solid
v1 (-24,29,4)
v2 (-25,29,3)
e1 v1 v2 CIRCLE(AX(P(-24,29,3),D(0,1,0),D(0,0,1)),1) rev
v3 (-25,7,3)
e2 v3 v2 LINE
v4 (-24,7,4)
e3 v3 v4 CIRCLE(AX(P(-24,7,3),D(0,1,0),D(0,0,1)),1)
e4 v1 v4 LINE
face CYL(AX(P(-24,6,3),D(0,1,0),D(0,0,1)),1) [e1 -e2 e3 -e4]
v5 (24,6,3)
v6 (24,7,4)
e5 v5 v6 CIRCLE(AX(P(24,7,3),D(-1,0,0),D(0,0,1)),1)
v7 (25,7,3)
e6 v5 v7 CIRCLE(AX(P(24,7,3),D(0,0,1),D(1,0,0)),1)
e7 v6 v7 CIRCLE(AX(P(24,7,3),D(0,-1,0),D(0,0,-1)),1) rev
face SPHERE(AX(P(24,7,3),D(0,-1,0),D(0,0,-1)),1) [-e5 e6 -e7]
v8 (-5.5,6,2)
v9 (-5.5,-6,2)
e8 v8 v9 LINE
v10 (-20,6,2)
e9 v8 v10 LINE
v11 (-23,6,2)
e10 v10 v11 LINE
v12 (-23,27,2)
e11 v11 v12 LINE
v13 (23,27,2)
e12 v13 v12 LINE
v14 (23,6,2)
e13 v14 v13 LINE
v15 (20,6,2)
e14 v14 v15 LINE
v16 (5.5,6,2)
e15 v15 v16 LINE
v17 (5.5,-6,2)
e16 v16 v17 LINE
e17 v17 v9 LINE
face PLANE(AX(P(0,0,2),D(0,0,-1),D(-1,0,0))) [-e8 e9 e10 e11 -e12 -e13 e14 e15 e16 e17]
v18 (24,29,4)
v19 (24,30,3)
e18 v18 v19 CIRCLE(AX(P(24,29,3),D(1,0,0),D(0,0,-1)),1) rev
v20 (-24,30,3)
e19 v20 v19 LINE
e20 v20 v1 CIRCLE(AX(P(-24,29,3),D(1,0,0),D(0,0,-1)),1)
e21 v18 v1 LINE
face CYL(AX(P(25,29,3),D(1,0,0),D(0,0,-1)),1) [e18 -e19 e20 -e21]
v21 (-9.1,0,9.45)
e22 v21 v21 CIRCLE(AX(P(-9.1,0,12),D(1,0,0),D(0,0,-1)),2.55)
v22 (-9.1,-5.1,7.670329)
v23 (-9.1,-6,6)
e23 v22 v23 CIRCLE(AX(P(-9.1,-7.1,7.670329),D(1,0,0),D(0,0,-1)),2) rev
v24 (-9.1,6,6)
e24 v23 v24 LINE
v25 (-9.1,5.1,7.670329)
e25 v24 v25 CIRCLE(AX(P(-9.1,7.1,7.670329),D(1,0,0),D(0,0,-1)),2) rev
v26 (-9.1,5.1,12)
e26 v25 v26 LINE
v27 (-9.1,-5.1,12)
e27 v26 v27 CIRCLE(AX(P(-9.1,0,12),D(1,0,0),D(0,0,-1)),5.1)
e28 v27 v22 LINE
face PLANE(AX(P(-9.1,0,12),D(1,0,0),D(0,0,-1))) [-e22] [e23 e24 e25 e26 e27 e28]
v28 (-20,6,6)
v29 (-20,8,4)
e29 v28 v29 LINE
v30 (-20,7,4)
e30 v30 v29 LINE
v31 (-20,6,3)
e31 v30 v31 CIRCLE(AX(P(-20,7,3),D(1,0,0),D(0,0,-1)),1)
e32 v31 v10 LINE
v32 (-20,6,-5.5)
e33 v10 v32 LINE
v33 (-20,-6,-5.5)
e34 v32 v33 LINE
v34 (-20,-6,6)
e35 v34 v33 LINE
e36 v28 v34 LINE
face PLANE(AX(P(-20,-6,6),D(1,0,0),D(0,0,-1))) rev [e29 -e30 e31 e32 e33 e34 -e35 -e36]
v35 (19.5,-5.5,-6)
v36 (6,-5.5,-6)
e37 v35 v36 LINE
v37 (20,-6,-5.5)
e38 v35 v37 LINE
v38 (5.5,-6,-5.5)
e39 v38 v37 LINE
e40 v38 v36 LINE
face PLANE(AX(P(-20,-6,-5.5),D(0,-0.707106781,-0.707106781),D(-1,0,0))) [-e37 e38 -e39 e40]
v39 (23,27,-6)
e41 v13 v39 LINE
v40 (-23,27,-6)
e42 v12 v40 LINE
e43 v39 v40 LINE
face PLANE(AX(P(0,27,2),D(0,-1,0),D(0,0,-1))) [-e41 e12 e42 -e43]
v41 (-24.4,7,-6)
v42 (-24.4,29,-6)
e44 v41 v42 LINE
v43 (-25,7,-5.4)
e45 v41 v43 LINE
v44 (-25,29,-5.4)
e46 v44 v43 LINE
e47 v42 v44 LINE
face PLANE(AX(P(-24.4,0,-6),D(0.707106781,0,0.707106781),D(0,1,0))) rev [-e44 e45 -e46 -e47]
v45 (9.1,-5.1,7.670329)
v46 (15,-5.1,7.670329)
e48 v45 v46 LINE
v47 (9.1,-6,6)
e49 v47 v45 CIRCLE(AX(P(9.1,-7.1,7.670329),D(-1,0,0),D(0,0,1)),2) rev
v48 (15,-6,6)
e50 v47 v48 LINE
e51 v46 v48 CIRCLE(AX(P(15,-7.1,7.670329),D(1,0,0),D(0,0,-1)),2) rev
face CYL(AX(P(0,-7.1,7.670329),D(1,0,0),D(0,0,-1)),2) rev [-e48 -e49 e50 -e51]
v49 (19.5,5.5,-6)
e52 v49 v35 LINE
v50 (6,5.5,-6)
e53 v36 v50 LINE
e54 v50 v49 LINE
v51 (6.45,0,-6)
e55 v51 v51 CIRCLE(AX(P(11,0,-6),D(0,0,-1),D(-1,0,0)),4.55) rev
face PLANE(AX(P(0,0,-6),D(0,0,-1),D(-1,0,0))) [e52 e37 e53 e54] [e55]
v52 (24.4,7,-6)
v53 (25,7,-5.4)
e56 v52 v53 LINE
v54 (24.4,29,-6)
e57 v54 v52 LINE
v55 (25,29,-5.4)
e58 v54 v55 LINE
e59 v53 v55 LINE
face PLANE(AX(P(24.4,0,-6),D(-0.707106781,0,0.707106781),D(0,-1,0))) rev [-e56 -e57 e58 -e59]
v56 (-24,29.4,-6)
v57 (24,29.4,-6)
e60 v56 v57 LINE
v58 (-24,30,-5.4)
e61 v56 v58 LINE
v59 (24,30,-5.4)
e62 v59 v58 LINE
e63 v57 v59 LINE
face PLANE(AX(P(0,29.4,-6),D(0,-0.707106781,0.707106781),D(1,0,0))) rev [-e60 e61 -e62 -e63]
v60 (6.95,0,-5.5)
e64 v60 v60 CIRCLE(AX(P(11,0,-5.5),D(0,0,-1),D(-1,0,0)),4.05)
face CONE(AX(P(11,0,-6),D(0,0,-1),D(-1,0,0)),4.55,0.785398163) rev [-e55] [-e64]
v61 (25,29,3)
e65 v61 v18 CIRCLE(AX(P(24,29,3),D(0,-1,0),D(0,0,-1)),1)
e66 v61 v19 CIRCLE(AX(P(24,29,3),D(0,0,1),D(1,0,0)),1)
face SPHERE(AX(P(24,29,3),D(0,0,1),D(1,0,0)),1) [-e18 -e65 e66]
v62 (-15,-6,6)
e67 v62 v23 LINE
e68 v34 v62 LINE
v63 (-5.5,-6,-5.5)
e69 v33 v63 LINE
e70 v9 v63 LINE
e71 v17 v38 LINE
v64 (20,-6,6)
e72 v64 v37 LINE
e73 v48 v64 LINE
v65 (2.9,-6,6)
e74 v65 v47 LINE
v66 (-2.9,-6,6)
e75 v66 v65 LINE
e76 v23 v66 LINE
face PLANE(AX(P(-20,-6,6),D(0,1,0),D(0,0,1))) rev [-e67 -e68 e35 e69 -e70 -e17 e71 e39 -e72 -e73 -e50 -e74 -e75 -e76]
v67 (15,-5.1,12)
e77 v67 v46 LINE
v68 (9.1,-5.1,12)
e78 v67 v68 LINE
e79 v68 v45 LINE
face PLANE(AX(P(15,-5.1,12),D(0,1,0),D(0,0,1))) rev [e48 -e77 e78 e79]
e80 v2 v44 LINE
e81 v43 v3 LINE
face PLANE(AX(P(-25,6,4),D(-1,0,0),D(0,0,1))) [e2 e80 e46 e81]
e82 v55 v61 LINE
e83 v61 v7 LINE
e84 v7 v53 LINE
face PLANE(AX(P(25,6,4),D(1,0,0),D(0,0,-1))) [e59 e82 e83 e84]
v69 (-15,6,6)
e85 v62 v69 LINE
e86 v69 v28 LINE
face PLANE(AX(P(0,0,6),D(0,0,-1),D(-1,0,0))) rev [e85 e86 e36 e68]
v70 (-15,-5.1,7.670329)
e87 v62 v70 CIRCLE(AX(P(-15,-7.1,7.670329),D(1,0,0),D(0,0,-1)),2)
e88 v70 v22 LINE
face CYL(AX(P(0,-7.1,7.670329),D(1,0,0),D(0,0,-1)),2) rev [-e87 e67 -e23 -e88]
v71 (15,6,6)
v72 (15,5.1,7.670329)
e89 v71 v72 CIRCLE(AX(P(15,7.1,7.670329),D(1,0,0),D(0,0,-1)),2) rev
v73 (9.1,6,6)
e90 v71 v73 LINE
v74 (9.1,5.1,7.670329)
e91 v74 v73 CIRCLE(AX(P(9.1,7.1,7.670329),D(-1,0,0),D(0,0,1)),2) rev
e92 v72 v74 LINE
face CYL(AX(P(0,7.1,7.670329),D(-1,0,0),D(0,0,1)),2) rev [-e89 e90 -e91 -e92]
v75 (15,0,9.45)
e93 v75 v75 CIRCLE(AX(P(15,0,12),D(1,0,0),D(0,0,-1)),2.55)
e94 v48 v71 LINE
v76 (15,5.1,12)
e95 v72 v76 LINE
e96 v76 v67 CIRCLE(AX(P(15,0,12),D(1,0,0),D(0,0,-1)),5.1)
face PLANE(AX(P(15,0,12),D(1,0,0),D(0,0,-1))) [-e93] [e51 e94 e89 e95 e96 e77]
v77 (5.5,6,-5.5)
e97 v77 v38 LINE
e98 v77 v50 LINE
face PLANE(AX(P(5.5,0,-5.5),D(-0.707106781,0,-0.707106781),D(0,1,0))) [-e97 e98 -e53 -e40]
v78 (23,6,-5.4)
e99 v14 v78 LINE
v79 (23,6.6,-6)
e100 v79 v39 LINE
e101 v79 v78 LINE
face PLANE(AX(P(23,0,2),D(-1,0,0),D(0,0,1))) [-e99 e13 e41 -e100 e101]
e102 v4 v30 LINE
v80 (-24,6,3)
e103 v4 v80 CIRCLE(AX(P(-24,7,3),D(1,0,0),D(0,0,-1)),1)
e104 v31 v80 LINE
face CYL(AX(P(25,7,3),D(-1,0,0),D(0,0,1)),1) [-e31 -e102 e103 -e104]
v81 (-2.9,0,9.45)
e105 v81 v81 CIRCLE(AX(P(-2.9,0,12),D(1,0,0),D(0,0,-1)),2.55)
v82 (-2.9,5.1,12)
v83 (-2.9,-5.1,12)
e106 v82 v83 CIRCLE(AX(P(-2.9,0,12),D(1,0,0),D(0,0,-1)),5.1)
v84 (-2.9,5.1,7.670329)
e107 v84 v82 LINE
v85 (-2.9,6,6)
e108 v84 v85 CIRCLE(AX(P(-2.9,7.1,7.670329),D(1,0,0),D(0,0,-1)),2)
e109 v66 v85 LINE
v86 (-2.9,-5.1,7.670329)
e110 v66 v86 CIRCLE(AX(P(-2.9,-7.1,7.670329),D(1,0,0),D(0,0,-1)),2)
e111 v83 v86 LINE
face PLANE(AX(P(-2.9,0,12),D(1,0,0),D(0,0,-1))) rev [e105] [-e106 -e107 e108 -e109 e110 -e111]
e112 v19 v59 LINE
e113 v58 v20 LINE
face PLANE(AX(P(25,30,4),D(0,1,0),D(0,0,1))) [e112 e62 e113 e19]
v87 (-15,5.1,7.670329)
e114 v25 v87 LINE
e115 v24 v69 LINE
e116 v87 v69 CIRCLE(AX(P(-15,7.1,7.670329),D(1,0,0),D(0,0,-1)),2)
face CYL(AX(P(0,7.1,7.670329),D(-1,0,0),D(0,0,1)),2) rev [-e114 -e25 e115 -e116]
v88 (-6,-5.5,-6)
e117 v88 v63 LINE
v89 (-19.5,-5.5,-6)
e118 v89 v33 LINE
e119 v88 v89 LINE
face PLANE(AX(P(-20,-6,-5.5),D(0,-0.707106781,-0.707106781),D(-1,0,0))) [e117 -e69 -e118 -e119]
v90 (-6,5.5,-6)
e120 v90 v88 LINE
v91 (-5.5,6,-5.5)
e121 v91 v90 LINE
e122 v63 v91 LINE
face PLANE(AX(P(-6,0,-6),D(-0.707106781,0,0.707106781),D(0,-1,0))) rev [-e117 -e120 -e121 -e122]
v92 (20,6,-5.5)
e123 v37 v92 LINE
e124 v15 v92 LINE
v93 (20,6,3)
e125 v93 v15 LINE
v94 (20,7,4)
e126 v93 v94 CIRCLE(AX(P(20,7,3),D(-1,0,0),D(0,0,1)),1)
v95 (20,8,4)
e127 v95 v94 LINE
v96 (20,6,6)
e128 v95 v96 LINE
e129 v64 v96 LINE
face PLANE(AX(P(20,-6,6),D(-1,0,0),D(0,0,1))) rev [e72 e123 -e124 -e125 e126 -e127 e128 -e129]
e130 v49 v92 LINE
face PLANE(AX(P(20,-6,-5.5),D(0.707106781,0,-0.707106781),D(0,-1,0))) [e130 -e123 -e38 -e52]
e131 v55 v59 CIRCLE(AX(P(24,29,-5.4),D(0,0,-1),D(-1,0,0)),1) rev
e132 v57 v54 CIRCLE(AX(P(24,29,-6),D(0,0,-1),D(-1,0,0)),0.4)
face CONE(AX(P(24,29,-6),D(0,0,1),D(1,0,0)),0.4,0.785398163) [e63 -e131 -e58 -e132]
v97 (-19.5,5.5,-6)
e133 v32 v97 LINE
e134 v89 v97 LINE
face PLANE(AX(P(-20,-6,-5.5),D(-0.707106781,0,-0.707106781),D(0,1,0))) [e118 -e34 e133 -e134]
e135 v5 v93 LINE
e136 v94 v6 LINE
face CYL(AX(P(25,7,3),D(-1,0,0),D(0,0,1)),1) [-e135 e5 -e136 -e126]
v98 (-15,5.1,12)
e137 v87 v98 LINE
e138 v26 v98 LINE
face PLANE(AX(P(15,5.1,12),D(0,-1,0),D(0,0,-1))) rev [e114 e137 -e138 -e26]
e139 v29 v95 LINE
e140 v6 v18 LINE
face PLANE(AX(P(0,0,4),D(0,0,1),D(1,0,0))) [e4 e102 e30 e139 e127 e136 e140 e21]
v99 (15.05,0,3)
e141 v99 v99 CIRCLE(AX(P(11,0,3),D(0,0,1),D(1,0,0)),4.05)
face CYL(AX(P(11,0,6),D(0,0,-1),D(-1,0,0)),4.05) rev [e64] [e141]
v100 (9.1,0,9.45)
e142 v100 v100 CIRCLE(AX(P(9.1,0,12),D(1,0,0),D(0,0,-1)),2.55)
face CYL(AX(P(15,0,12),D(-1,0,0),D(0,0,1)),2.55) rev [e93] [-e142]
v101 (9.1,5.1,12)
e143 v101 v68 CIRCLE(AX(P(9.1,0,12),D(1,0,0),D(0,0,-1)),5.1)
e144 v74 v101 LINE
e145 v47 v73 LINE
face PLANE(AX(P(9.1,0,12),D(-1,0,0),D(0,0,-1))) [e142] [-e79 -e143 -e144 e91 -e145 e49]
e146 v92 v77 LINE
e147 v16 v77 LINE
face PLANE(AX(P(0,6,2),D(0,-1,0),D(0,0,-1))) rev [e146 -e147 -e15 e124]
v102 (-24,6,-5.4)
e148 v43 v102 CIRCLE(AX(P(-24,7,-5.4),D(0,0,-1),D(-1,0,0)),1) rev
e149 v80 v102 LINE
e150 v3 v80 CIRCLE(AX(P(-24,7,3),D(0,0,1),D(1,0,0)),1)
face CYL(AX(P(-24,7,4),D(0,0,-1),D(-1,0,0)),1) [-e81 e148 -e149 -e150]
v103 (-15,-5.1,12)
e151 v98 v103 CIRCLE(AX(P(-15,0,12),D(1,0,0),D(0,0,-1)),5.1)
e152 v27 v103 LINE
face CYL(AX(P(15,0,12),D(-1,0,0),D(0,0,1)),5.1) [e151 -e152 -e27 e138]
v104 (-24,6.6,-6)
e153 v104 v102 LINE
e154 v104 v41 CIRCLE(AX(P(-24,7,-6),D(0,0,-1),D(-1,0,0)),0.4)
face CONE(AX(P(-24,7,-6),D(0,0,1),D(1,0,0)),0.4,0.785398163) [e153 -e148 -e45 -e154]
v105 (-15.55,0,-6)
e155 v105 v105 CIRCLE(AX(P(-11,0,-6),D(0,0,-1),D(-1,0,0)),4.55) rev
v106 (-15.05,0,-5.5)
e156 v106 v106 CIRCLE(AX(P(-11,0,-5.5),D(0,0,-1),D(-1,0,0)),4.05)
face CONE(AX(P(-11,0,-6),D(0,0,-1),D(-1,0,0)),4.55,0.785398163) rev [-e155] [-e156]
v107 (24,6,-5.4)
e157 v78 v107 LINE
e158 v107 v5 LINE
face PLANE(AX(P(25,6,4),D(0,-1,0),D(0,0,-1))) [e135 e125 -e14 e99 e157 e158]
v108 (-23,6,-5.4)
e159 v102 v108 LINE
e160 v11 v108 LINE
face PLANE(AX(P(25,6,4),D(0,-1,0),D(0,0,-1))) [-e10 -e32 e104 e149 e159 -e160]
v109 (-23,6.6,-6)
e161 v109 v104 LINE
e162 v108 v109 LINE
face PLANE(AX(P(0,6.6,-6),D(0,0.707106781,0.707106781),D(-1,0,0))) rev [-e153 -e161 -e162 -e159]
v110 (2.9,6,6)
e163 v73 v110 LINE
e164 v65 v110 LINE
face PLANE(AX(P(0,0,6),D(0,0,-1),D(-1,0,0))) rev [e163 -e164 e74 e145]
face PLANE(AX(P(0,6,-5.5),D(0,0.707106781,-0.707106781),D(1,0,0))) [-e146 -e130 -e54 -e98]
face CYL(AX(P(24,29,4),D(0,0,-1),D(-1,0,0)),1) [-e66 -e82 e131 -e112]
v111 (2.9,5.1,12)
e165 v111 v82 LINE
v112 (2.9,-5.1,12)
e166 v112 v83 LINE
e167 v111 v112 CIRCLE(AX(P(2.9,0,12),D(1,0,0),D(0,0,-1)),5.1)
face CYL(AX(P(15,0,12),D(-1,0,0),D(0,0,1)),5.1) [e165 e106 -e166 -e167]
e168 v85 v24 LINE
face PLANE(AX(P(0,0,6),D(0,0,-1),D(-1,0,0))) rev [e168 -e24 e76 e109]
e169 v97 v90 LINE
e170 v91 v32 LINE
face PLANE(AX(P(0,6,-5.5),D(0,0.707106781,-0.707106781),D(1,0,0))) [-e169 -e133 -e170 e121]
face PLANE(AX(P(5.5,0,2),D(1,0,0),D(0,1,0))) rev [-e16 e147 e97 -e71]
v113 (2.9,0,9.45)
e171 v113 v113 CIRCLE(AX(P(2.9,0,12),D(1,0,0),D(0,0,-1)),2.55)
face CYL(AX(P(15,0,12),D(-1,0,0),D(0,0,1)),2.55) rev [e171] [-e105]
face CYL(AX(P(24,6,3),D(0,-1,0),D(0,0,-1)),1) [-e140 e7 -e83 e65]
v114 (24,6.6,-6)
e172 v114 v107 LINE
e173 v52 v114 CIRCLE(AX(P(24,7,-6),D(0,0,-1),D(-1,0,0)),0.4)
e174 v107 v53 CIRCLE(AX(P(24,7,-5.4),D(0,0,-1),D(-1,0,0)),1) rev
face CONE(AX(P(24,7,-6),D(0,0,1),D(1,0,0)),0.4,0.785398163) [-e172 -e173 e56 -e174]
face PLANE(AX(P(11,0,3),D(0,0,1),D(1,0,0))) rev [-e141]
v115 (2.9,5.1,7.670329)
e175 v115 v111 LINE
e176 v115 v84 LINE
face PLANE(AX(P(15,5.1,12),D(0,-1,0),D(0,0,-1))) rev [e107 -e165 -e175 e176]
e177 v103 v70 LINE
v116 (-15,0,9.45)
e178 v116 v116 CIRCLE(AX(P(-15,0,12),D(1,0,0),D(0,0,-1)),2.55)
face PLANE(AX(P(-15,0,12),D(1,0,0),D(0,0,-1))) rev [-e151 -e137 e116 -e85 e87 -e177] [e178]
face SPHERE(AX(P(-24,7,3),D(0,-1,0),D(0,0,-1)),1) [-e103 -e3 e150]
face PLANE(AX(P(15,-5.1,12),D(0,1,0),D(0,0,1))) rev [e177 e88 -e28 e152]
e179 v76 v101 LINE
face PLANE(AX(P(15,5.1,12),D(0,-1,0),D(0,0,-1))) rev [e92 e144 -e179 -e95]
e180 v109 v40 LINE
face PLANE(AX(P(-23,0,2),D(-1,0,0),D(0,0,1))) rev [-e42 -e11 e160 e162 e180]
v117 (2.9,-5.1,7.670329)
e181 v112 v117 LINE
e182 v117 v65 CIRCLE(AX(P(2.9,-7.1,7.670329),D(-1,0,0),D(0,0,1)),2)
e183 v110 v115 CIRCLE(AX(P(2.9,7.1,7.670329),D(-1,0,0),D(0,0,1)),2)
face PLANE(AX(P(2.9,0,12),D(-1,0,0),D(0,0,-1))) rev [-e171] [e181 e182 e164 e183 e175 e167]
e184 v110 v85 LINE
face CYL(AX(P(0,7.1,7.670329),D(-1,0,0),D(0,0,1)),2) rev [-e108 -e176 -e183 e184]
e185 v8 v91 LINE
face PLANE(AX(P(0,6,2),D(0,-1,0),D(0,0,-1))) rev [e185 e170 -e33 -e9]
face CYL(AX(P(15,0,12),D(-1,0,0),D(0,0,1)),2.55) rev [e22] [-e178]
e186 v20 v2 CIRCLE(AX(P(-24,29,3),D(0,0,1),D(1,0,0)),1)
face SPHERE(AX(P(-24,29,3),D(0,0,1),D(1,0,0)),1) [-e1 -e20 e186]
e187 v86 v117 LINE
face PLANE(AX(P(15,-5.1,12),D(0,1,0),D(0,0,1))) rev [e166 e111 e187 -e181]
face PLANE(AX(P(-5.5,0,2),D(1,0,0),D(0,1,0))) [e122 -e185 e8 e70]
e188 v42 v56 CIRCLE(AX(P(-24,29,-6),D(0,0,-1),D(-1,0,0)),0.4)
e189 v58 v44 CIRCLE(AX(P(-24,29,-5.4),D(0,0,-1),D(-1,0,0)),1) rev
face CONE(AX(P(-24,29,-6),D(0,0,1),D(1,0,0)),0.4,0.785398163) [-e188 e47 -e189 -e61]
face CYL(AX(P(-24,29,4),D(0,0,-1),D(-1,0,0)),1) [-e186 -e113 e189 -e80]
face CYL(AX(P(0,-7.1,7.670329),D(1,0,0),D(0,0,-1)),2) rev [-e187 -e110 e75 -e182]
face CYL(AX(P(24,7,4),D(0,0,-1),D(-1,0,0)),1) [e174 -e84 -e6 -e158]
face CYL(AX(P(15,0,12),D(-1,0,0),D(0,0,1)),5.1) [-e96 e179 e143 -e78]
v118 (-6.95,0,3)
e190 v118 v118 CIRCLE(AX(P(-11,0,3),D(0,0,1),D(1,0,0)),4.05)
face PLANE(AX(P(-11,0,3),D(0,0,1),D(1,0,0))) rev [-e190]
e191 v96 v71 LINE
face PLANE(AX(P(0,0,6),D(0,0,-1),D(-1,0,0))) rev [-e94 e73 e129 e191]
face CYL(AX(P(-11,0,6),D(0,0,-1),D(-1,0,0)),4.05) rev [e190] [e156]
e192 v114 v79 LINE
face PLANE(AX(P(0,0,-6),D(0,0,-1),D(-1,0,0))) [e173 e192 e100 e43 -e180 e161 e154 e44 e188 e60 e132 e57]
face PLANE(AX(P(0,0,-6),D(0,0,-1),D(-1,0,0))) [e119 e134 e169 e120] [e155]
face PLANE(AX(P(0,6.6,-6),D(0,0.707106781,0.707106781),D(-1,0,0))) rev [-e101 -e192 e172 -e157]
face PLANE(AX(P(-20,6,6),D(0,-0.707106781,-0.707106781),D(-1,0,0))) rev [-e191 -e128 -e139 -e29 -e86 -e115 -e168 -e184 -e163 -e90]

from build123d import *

# Parameters (mm, degrees)
SKETCH1_W           = 40
SKETCH1_H           = 12
SKETCH1_R           = 4.05
BOSS_EXTRUDE1_DEPTH = 6
SKETCH3_R           = 2.55
BOSS_EXTRUDE2_DEPTH = 15
CUT_EXTRUDE1_START  = -2.9
SKETCH3_2_R         = 2.55
CUT_EXTRUDE1_DEPTH  = 6.2
BOSS_EXTRUDE3_START = -3
SKETCH5_R           = 4.05
BOSS_EXTRUDE3_DEPTH = 3
SKETCH6_W           = 50
SKETCH6_H           = 24
BOSS_EXTRUDE4_DEPTH = 10
SKETCH8_W           = 11
SKETCH8_H           = 12
CUT_EXTRUDE2_DEPTH  = 8
CHAMFER1_SIZE       = 2
FILLET1_R           = 1
FILLET2_R           = 1
CHAMFER2_SIZE       = 0.6
CHAMFER3_SIZE       = 0.5
FILLET3_R           = 2


# Some blends are built 0.0001 mm under size
with BuildPart() as part:
    # Sketch1 → Boss-Extrude1 (new, symmetric)
    with BuildSketch(Plane.XY):
        Rectangle(SKETCH1_W, SKETCH1_H)
        with Locations((11, 0)):
            Circle(SKETCH1_R, mode=Mode.SUBTRACT)
        with Locations(Location((-11, 0, 0), (0, 0, 180))):
            Circle(SKETCH1_R, mode=Mode.SUBTRACT)
    extrude(amount=BOSS_EXTRUDE1_DEPTH, both=True)

    # Sketch3 → Boss-Extrude2 (add, symmetric)
    with BuildSketch(Plane(origin=(0, 0, 0), x_dir=(0, 0, -1), z_dir=(1, 0, 0))):
        with BuildLine():
            Line((-12, -5.1), (-6, -5.1))
            Line((-6, -5.1), (-6, 5.1))
            Line((-6, 5.1), (-12, 5.1))
            ThreePointArc((-12, 5.1), (-17.1, 0), (-12, -5.1))
        make_face()
        with Locations((-12, 0)):
            Circle(SKETCH3_R, mode=Mode.SUBTRACT)
    extrude(amount=BOSS_EXTRUDE2_DEPTH, both=True)

    # Sketch3<2> → Cut-Extrude1 (cut)
    with BuildSketch(Plane(origin=(0, 0, 0), x_dir=(0, 0, -1), z_dir=(1, 0, 0)).offset(CUT_EXTRUDE1_START)):
        with BuildLine():
            Line((-12, -5.1), (-6, -5.1))
            Line((-6, -5.1), (-6, 5.1))
            Line((-6, 5.1), (-12, 5.1))
            ThreePointArc((-12, 5.1), (-17.1, 0), (-12, -5.1))
        make_face()
        with Locations((-12, 0)):
            Circle(SKETCH3_2_R, mode=Mode.SUBTRACT)
    cut_extrude1 = extrude(amount=-CUT_EXTRUDE1_DEPTH, mode=Mode.SUBTRACT)

    # Mirror1: Cut-Extrude1 across plane
    add(cut_extrude1.mirror(Plane(origin=(0, 0, 0), x_dir=(0, 0, 1), z_dir=(1, 0, 0))), mode=Mode.SUBTRACT)

    # Sketch5 → Boss-Extrude3 (add)
    with BuildSketch(Plane.XY.offset(6).offset(BOSS_EXTRUDE3_START)):
        with Locations(Location((-11, 0, 0), (0, 0, 180))):
            Circle(SKETCH5_R)
        with Locations((11, 0)):
            Circle(SKETCH5_R)
    extrude(amount=BOSS_EXTRUDE3_DEPTH)

    # Sketch6 → Boss-Extrude4 (add)
    with BuildSketch(Plane(origin=(0, 0, -6), x_dir=(-1, 0, 0), z_dir=(0, 0, -1))):
        with Locations((0, 18)):
            Rectangle(SKETCH6_W, SKETCH6_H)
    extrude(amount=-BOSS_EXTRUDE4_DEPTH)

    # Sketch8 → Cut-Extrude2 (cut)
    with BuildSketch(Plane(origin=(0, 0, -6), x_dir=(-1, 0, 0), z_dir=(0, 0, -1))):
        Rectangle(SKETCH8_W, SKETCH8_H)
        Polygon((-23, 27), (-23, 6), (-20, 6), (-5.5, 6), (5.5, 6), (20, 6), (23, 6), (23, 27), align=None)
    extrude(amount=-CUT_EXTRUDE2_DEPTH, mode=Mode.SUBTRACT)

    # Chamfer1
    chamfer1_edges = [part.edges().sort_by_distance(p)[0] for p in [
        (0, 6, 4),
    ]]
    chamfer(chamfer1_edges, length=CHAMFER1_SIZE - 0.0001)  # a hair under: the kernel refuses the full size

    # Fillet1
    fillet1_edges = [part.edges().sort_by_distance(p)[0] for p in [
        (25, 18, 4),
        (0, 30, 4),
        (-25, 18, 4),
    ]]
    fillet(fillet1_edges, radius=FILLET1_R)

    # Fillet2
    # the kernel refuses this fillet: 1 mm, written as the material it takes off along each edge
    with BuildSketch(Plane(origin=(24, 29, 3), x_dir=(0, 1, 0), z_dir=(1, 0, 0))) as fillet2_piece_1_section:
        Polygon((0, 0), (FILLET2_R, 0), (FILLET2_R, FILLET2_R), (0, FILLET2_R), align=None)
    fillet2_piece_1 = extrude(amount=FILLET2_R, mode=Mode.PRIVATE)
    fillet2_piece_1 = fillet2_piece_1 - Plane(origin=(24, 29, 3), x_dir=(0, -0.7071067811865475, -0.7071067811865475), z_dir=(1, 0, 0)) * Sphere(FILLET2_R, mode=Mode.PRIVATE)
    add(fillet2_piece_1, mode=Mode.SUBTRACT)
    with BuildSketch(Plane(origin=(-24, 29, 3), x_dir=(-1, 0, 0), z_dir=(0, 1, 0))) as fillet2_piece_2_section:
        Polygon((0, 0), (FILLET2_R, 0), (FILLET2_R, FILLET2_R), (0, FILLET2_R), align=None)
    fillet2_piece_2 = extrude(amount=FILLET2_R, mode=Mode.PRIVATE)
    fillet2_piece_2 = fillet2_piece_2 - Plane(origin=(-24, 29, 3), x_dir=(0.7071067811865475, 0, -0.7071067811865475), z_dir=(0, 1, 0)) * Sphere(FILLET2_R, mode=Mode.PRIVATE)
    add(fillet2_piece_2, mode=Mode.SUBTRACT)
    with BuildSketch(Plane(origin=(-20, 6, 4), x_dir=(0, 1, 0), z_dir=(-1, 0, 0)), Plane(origin=(24, 6, 4), x_dir=(0, 1, 0), z_dir=(-1, 0, 0))) as fillet2_piece_3:
        with BuildLine():
            CenterArc((FILLET2_R, FILLET2_R), FILLET2_R, 180, 90)
            Line((0, FILLET2_R), (0, 0))
            Line((0, 0), (FILLET2_R, 0))
        make_face()
    extrude(amount=4, mode=Mode.SUBTRACT)
    with BuildSketch(Plane(origin=(-25, 6, -8.5), x_dir=(1, 0, 0), z_dir=(0, 0, 1))) as fillet2_piece_4:
        with BuildLine():
            CenterArc((FILLET2_R, FILLET2_R), FILLET2_R, 180, 90)
            Line((0, FILLET2_R), (0, 0))
            Line((0, 0), (FILLET2_R, 0))
        make_face()
    extrude(amount=11.5, mode=Mode.SUBTRACT)
    with BuildSketch(Plane(origin=(-25, 30, -8.5), x_dir=(1, 0, 0), z_dir=(0, 0, 1)), Plane(origin=(25, 30, -8.5), x_dir=(0, -1, 0), z_dir=(0, 0, 1)), Plane(origin=(25, 6, -8.5), x_dir=(-1, 0, 0), z_dir=(0, 0, 1))) as fillet2_piece_5:
        with BuildLine():
            CenterArc((FILLET2_R, -FILLET2_R), FILLET2_R, 90, 90)
            Line((0, -FILLET2_R), (0, 0))
            Line((0, 0), (FILLET2_R, 0))
        make_face()
    extrude(amount=11.5, mode=Mode.SUBTRACT)
    with BuildSketch(Plane(origin=(-24, 6, 3), x_dir=(0, 0, 1), z_dir=(1, 0, 0))) as fillet2_piece_6:
        with BuildLine():
            CenterArc((1 - FILLET2_R, -FILLET2_R), FILLET2_R, 0, 90)
            Line((1 - FILLET2_R, 0), (1, 0))
            Line((1, 0), (1, -FILLET2_R))
        make_face()
    revolve(axis=Axis((-24, 6, 3), (0, -1, 0)), revolution_arc=90, mode=Mode.SUBTRACT)
    with BuildSketch(Plane(origin=(24, 6, 3), x_dir=(0, 0, 1), z_dir=(-1, 0, 0))) as fillet2_piece_7:
        with BuildLine():
            CenterArc((1 - FILLET2_R, FILLET2_R), FILLET2_R, 270, 90)
            Line((1, FILLET2_R), (1, 0))
            Line((1, 0), (1 - FILLET2_R, 0))
        make_face()
    revolve(axis=Axis((24, 6, 3), (0, 1, 0)), revolution_arc=90, mode=Mode.SUBTRACT)

    # Chamfer2
    chamfer2_edges = [part.edges().sort_by_distance(p)[0] for p in [
        (-23.5, 6, -6),
        (23.5, 6, -6),
        (-25, 18, -6),
        (0, 30, -6),
        (25, 18, -6),
        (24.707106781, 29.707106781, -6),
        (-24.707106781, 29.707106781, -6),
        (24.707106781, 6.292893219, -6),
        (-24.707106781, 6.292893219, -6),
    ]]
    chamfer(chamfer2_edges, length=CHAMFER2_SIZE)

    # Chamfer3
    chamfer3_edges = [part.edges().sort_by_distance(p)[0] for p in [
        (12.75, -6, -6),
        (6.95, 0, -6),
        (-5.5, 0, -6),
        (-12.75, 6, -6),
        (12.75, 6, -6),
        (5.5, 0, -6),
        (-6.95, 0, -6),
        (-12.75, -6, -6),
        (-20, 0, -6),
        (20, 0, -6),
    ]]
    chamfer(chamfer3_edges, length=CHAMFER3_SIZE)

    # Fillet3
    # the kernel refuses this fillet: 2 mm, written as the material it adds along each edge
    with BuildSketch(Plane(origin=(9.1, -5.1, 6), x_dir=(0, -1.0, 1.5355618011688864e-12), z_dir=(1, 0, 0)), Plane(origin=(-15, -5.1, 6), x_dir=(0, -1.0, 1.5355618011688864e-12), z_dir=(1, 0, 0))) as fillet3_piece_1:
        with BuildLine():
            CenterArc((2, -1.670329309), FILLET3_R, 123.367012969, 56.632987031)
            Line((0, -1.670329309), (-0.04, -1.670329309))
            Line((-0.04, -1.670329309), (-0.04, 0))
            Line((-0.04, 0), (0, 0.04))
            ThreePointArc((0, 0.04), (0.45, 0.04), (0.878, 0.033406586))
            Line((0.878, 0.033406586), (0.9, 0))
        make_face()
    extrude(amount=5.9)
    with BuildSketch(Plane(origin=(9.1, 5.1, 6), x_dir=(0, 1.0, 1.5326012064365571e-12), z_dir=(1, 0, 0)), Plane(origin=(-15, 5.1, 6), x_dir=(0, 1.0, 1.5326012064365571e-12), z_dir=(1, 0, 0))) as fillet3_piece_2:
        with BuildLine():
            CenterArc((2, 1.670329309), FILLET3_R, 180, 56.632987031)
            Line((0, 1.670329309), (-0.04, 1.670329309))
            Line((-0.04, 1.670329309), (-0.04, 0))
            Line((-0.04, 0), (0, -0.04))
            ThreePointArc((0, -0.04), (0.45, -0.04), (0.878, -0.033406586))
            Line((0.878, -0.033406586), (0.9, 0))
        make_face()
    extrude(amount=5.9)
    with BuildSketch(Plane(origin=(-2.9, 5.1, 6), x_dir=(0, 1.0, 1.5326012064365571e-12), z_dir=(1, 0, 0))) as fillet3_piece_3:
        with BuildLine():
            CenterArc((2, 1.670329309), FILLET3_R, 180, 56.632987031)
            Line((0, 1.670329309), (-0.04, 1.670329309))
            Line((-0.04, 1.670329309), (-0.04, 0))
            Line((-0.04, 0), (0, -0.04))
            ThreePointArc((0, -0.04), (0.45, -0.04), (0.878, -0.033406586))
            Line((0.878, -0.033406586), (0.9, 0))
        make_face()
    extrude(amount=5.8)
    with BuildSketch(Plane(origin=(-2.9, -5.1, 6), x_dir=(0, -1.0, 1.5355618011688864e-12), z_dir=(1, 0, 0))) as fillet3_piece_4:
        with BuildLine():
            CenterArc((2, -1.670329309), FILLET3_R, 123.367012969, 56.632987031)
            Line((0, -1.670329309), (-0.04, -1.670329309))
            Line((-0.04, -1.670329309), (-0.04, 0))
            Line((-0.04, 0), (0, 0.04))
            ThreePointArc((0, 0.04), (0.45, 0.04), (0.878, 0.033406586))
            Line((0.878, 0.033406586), (0.9, 0))
        make_face()
    extrude(amount=5.8)


solid = part.part
